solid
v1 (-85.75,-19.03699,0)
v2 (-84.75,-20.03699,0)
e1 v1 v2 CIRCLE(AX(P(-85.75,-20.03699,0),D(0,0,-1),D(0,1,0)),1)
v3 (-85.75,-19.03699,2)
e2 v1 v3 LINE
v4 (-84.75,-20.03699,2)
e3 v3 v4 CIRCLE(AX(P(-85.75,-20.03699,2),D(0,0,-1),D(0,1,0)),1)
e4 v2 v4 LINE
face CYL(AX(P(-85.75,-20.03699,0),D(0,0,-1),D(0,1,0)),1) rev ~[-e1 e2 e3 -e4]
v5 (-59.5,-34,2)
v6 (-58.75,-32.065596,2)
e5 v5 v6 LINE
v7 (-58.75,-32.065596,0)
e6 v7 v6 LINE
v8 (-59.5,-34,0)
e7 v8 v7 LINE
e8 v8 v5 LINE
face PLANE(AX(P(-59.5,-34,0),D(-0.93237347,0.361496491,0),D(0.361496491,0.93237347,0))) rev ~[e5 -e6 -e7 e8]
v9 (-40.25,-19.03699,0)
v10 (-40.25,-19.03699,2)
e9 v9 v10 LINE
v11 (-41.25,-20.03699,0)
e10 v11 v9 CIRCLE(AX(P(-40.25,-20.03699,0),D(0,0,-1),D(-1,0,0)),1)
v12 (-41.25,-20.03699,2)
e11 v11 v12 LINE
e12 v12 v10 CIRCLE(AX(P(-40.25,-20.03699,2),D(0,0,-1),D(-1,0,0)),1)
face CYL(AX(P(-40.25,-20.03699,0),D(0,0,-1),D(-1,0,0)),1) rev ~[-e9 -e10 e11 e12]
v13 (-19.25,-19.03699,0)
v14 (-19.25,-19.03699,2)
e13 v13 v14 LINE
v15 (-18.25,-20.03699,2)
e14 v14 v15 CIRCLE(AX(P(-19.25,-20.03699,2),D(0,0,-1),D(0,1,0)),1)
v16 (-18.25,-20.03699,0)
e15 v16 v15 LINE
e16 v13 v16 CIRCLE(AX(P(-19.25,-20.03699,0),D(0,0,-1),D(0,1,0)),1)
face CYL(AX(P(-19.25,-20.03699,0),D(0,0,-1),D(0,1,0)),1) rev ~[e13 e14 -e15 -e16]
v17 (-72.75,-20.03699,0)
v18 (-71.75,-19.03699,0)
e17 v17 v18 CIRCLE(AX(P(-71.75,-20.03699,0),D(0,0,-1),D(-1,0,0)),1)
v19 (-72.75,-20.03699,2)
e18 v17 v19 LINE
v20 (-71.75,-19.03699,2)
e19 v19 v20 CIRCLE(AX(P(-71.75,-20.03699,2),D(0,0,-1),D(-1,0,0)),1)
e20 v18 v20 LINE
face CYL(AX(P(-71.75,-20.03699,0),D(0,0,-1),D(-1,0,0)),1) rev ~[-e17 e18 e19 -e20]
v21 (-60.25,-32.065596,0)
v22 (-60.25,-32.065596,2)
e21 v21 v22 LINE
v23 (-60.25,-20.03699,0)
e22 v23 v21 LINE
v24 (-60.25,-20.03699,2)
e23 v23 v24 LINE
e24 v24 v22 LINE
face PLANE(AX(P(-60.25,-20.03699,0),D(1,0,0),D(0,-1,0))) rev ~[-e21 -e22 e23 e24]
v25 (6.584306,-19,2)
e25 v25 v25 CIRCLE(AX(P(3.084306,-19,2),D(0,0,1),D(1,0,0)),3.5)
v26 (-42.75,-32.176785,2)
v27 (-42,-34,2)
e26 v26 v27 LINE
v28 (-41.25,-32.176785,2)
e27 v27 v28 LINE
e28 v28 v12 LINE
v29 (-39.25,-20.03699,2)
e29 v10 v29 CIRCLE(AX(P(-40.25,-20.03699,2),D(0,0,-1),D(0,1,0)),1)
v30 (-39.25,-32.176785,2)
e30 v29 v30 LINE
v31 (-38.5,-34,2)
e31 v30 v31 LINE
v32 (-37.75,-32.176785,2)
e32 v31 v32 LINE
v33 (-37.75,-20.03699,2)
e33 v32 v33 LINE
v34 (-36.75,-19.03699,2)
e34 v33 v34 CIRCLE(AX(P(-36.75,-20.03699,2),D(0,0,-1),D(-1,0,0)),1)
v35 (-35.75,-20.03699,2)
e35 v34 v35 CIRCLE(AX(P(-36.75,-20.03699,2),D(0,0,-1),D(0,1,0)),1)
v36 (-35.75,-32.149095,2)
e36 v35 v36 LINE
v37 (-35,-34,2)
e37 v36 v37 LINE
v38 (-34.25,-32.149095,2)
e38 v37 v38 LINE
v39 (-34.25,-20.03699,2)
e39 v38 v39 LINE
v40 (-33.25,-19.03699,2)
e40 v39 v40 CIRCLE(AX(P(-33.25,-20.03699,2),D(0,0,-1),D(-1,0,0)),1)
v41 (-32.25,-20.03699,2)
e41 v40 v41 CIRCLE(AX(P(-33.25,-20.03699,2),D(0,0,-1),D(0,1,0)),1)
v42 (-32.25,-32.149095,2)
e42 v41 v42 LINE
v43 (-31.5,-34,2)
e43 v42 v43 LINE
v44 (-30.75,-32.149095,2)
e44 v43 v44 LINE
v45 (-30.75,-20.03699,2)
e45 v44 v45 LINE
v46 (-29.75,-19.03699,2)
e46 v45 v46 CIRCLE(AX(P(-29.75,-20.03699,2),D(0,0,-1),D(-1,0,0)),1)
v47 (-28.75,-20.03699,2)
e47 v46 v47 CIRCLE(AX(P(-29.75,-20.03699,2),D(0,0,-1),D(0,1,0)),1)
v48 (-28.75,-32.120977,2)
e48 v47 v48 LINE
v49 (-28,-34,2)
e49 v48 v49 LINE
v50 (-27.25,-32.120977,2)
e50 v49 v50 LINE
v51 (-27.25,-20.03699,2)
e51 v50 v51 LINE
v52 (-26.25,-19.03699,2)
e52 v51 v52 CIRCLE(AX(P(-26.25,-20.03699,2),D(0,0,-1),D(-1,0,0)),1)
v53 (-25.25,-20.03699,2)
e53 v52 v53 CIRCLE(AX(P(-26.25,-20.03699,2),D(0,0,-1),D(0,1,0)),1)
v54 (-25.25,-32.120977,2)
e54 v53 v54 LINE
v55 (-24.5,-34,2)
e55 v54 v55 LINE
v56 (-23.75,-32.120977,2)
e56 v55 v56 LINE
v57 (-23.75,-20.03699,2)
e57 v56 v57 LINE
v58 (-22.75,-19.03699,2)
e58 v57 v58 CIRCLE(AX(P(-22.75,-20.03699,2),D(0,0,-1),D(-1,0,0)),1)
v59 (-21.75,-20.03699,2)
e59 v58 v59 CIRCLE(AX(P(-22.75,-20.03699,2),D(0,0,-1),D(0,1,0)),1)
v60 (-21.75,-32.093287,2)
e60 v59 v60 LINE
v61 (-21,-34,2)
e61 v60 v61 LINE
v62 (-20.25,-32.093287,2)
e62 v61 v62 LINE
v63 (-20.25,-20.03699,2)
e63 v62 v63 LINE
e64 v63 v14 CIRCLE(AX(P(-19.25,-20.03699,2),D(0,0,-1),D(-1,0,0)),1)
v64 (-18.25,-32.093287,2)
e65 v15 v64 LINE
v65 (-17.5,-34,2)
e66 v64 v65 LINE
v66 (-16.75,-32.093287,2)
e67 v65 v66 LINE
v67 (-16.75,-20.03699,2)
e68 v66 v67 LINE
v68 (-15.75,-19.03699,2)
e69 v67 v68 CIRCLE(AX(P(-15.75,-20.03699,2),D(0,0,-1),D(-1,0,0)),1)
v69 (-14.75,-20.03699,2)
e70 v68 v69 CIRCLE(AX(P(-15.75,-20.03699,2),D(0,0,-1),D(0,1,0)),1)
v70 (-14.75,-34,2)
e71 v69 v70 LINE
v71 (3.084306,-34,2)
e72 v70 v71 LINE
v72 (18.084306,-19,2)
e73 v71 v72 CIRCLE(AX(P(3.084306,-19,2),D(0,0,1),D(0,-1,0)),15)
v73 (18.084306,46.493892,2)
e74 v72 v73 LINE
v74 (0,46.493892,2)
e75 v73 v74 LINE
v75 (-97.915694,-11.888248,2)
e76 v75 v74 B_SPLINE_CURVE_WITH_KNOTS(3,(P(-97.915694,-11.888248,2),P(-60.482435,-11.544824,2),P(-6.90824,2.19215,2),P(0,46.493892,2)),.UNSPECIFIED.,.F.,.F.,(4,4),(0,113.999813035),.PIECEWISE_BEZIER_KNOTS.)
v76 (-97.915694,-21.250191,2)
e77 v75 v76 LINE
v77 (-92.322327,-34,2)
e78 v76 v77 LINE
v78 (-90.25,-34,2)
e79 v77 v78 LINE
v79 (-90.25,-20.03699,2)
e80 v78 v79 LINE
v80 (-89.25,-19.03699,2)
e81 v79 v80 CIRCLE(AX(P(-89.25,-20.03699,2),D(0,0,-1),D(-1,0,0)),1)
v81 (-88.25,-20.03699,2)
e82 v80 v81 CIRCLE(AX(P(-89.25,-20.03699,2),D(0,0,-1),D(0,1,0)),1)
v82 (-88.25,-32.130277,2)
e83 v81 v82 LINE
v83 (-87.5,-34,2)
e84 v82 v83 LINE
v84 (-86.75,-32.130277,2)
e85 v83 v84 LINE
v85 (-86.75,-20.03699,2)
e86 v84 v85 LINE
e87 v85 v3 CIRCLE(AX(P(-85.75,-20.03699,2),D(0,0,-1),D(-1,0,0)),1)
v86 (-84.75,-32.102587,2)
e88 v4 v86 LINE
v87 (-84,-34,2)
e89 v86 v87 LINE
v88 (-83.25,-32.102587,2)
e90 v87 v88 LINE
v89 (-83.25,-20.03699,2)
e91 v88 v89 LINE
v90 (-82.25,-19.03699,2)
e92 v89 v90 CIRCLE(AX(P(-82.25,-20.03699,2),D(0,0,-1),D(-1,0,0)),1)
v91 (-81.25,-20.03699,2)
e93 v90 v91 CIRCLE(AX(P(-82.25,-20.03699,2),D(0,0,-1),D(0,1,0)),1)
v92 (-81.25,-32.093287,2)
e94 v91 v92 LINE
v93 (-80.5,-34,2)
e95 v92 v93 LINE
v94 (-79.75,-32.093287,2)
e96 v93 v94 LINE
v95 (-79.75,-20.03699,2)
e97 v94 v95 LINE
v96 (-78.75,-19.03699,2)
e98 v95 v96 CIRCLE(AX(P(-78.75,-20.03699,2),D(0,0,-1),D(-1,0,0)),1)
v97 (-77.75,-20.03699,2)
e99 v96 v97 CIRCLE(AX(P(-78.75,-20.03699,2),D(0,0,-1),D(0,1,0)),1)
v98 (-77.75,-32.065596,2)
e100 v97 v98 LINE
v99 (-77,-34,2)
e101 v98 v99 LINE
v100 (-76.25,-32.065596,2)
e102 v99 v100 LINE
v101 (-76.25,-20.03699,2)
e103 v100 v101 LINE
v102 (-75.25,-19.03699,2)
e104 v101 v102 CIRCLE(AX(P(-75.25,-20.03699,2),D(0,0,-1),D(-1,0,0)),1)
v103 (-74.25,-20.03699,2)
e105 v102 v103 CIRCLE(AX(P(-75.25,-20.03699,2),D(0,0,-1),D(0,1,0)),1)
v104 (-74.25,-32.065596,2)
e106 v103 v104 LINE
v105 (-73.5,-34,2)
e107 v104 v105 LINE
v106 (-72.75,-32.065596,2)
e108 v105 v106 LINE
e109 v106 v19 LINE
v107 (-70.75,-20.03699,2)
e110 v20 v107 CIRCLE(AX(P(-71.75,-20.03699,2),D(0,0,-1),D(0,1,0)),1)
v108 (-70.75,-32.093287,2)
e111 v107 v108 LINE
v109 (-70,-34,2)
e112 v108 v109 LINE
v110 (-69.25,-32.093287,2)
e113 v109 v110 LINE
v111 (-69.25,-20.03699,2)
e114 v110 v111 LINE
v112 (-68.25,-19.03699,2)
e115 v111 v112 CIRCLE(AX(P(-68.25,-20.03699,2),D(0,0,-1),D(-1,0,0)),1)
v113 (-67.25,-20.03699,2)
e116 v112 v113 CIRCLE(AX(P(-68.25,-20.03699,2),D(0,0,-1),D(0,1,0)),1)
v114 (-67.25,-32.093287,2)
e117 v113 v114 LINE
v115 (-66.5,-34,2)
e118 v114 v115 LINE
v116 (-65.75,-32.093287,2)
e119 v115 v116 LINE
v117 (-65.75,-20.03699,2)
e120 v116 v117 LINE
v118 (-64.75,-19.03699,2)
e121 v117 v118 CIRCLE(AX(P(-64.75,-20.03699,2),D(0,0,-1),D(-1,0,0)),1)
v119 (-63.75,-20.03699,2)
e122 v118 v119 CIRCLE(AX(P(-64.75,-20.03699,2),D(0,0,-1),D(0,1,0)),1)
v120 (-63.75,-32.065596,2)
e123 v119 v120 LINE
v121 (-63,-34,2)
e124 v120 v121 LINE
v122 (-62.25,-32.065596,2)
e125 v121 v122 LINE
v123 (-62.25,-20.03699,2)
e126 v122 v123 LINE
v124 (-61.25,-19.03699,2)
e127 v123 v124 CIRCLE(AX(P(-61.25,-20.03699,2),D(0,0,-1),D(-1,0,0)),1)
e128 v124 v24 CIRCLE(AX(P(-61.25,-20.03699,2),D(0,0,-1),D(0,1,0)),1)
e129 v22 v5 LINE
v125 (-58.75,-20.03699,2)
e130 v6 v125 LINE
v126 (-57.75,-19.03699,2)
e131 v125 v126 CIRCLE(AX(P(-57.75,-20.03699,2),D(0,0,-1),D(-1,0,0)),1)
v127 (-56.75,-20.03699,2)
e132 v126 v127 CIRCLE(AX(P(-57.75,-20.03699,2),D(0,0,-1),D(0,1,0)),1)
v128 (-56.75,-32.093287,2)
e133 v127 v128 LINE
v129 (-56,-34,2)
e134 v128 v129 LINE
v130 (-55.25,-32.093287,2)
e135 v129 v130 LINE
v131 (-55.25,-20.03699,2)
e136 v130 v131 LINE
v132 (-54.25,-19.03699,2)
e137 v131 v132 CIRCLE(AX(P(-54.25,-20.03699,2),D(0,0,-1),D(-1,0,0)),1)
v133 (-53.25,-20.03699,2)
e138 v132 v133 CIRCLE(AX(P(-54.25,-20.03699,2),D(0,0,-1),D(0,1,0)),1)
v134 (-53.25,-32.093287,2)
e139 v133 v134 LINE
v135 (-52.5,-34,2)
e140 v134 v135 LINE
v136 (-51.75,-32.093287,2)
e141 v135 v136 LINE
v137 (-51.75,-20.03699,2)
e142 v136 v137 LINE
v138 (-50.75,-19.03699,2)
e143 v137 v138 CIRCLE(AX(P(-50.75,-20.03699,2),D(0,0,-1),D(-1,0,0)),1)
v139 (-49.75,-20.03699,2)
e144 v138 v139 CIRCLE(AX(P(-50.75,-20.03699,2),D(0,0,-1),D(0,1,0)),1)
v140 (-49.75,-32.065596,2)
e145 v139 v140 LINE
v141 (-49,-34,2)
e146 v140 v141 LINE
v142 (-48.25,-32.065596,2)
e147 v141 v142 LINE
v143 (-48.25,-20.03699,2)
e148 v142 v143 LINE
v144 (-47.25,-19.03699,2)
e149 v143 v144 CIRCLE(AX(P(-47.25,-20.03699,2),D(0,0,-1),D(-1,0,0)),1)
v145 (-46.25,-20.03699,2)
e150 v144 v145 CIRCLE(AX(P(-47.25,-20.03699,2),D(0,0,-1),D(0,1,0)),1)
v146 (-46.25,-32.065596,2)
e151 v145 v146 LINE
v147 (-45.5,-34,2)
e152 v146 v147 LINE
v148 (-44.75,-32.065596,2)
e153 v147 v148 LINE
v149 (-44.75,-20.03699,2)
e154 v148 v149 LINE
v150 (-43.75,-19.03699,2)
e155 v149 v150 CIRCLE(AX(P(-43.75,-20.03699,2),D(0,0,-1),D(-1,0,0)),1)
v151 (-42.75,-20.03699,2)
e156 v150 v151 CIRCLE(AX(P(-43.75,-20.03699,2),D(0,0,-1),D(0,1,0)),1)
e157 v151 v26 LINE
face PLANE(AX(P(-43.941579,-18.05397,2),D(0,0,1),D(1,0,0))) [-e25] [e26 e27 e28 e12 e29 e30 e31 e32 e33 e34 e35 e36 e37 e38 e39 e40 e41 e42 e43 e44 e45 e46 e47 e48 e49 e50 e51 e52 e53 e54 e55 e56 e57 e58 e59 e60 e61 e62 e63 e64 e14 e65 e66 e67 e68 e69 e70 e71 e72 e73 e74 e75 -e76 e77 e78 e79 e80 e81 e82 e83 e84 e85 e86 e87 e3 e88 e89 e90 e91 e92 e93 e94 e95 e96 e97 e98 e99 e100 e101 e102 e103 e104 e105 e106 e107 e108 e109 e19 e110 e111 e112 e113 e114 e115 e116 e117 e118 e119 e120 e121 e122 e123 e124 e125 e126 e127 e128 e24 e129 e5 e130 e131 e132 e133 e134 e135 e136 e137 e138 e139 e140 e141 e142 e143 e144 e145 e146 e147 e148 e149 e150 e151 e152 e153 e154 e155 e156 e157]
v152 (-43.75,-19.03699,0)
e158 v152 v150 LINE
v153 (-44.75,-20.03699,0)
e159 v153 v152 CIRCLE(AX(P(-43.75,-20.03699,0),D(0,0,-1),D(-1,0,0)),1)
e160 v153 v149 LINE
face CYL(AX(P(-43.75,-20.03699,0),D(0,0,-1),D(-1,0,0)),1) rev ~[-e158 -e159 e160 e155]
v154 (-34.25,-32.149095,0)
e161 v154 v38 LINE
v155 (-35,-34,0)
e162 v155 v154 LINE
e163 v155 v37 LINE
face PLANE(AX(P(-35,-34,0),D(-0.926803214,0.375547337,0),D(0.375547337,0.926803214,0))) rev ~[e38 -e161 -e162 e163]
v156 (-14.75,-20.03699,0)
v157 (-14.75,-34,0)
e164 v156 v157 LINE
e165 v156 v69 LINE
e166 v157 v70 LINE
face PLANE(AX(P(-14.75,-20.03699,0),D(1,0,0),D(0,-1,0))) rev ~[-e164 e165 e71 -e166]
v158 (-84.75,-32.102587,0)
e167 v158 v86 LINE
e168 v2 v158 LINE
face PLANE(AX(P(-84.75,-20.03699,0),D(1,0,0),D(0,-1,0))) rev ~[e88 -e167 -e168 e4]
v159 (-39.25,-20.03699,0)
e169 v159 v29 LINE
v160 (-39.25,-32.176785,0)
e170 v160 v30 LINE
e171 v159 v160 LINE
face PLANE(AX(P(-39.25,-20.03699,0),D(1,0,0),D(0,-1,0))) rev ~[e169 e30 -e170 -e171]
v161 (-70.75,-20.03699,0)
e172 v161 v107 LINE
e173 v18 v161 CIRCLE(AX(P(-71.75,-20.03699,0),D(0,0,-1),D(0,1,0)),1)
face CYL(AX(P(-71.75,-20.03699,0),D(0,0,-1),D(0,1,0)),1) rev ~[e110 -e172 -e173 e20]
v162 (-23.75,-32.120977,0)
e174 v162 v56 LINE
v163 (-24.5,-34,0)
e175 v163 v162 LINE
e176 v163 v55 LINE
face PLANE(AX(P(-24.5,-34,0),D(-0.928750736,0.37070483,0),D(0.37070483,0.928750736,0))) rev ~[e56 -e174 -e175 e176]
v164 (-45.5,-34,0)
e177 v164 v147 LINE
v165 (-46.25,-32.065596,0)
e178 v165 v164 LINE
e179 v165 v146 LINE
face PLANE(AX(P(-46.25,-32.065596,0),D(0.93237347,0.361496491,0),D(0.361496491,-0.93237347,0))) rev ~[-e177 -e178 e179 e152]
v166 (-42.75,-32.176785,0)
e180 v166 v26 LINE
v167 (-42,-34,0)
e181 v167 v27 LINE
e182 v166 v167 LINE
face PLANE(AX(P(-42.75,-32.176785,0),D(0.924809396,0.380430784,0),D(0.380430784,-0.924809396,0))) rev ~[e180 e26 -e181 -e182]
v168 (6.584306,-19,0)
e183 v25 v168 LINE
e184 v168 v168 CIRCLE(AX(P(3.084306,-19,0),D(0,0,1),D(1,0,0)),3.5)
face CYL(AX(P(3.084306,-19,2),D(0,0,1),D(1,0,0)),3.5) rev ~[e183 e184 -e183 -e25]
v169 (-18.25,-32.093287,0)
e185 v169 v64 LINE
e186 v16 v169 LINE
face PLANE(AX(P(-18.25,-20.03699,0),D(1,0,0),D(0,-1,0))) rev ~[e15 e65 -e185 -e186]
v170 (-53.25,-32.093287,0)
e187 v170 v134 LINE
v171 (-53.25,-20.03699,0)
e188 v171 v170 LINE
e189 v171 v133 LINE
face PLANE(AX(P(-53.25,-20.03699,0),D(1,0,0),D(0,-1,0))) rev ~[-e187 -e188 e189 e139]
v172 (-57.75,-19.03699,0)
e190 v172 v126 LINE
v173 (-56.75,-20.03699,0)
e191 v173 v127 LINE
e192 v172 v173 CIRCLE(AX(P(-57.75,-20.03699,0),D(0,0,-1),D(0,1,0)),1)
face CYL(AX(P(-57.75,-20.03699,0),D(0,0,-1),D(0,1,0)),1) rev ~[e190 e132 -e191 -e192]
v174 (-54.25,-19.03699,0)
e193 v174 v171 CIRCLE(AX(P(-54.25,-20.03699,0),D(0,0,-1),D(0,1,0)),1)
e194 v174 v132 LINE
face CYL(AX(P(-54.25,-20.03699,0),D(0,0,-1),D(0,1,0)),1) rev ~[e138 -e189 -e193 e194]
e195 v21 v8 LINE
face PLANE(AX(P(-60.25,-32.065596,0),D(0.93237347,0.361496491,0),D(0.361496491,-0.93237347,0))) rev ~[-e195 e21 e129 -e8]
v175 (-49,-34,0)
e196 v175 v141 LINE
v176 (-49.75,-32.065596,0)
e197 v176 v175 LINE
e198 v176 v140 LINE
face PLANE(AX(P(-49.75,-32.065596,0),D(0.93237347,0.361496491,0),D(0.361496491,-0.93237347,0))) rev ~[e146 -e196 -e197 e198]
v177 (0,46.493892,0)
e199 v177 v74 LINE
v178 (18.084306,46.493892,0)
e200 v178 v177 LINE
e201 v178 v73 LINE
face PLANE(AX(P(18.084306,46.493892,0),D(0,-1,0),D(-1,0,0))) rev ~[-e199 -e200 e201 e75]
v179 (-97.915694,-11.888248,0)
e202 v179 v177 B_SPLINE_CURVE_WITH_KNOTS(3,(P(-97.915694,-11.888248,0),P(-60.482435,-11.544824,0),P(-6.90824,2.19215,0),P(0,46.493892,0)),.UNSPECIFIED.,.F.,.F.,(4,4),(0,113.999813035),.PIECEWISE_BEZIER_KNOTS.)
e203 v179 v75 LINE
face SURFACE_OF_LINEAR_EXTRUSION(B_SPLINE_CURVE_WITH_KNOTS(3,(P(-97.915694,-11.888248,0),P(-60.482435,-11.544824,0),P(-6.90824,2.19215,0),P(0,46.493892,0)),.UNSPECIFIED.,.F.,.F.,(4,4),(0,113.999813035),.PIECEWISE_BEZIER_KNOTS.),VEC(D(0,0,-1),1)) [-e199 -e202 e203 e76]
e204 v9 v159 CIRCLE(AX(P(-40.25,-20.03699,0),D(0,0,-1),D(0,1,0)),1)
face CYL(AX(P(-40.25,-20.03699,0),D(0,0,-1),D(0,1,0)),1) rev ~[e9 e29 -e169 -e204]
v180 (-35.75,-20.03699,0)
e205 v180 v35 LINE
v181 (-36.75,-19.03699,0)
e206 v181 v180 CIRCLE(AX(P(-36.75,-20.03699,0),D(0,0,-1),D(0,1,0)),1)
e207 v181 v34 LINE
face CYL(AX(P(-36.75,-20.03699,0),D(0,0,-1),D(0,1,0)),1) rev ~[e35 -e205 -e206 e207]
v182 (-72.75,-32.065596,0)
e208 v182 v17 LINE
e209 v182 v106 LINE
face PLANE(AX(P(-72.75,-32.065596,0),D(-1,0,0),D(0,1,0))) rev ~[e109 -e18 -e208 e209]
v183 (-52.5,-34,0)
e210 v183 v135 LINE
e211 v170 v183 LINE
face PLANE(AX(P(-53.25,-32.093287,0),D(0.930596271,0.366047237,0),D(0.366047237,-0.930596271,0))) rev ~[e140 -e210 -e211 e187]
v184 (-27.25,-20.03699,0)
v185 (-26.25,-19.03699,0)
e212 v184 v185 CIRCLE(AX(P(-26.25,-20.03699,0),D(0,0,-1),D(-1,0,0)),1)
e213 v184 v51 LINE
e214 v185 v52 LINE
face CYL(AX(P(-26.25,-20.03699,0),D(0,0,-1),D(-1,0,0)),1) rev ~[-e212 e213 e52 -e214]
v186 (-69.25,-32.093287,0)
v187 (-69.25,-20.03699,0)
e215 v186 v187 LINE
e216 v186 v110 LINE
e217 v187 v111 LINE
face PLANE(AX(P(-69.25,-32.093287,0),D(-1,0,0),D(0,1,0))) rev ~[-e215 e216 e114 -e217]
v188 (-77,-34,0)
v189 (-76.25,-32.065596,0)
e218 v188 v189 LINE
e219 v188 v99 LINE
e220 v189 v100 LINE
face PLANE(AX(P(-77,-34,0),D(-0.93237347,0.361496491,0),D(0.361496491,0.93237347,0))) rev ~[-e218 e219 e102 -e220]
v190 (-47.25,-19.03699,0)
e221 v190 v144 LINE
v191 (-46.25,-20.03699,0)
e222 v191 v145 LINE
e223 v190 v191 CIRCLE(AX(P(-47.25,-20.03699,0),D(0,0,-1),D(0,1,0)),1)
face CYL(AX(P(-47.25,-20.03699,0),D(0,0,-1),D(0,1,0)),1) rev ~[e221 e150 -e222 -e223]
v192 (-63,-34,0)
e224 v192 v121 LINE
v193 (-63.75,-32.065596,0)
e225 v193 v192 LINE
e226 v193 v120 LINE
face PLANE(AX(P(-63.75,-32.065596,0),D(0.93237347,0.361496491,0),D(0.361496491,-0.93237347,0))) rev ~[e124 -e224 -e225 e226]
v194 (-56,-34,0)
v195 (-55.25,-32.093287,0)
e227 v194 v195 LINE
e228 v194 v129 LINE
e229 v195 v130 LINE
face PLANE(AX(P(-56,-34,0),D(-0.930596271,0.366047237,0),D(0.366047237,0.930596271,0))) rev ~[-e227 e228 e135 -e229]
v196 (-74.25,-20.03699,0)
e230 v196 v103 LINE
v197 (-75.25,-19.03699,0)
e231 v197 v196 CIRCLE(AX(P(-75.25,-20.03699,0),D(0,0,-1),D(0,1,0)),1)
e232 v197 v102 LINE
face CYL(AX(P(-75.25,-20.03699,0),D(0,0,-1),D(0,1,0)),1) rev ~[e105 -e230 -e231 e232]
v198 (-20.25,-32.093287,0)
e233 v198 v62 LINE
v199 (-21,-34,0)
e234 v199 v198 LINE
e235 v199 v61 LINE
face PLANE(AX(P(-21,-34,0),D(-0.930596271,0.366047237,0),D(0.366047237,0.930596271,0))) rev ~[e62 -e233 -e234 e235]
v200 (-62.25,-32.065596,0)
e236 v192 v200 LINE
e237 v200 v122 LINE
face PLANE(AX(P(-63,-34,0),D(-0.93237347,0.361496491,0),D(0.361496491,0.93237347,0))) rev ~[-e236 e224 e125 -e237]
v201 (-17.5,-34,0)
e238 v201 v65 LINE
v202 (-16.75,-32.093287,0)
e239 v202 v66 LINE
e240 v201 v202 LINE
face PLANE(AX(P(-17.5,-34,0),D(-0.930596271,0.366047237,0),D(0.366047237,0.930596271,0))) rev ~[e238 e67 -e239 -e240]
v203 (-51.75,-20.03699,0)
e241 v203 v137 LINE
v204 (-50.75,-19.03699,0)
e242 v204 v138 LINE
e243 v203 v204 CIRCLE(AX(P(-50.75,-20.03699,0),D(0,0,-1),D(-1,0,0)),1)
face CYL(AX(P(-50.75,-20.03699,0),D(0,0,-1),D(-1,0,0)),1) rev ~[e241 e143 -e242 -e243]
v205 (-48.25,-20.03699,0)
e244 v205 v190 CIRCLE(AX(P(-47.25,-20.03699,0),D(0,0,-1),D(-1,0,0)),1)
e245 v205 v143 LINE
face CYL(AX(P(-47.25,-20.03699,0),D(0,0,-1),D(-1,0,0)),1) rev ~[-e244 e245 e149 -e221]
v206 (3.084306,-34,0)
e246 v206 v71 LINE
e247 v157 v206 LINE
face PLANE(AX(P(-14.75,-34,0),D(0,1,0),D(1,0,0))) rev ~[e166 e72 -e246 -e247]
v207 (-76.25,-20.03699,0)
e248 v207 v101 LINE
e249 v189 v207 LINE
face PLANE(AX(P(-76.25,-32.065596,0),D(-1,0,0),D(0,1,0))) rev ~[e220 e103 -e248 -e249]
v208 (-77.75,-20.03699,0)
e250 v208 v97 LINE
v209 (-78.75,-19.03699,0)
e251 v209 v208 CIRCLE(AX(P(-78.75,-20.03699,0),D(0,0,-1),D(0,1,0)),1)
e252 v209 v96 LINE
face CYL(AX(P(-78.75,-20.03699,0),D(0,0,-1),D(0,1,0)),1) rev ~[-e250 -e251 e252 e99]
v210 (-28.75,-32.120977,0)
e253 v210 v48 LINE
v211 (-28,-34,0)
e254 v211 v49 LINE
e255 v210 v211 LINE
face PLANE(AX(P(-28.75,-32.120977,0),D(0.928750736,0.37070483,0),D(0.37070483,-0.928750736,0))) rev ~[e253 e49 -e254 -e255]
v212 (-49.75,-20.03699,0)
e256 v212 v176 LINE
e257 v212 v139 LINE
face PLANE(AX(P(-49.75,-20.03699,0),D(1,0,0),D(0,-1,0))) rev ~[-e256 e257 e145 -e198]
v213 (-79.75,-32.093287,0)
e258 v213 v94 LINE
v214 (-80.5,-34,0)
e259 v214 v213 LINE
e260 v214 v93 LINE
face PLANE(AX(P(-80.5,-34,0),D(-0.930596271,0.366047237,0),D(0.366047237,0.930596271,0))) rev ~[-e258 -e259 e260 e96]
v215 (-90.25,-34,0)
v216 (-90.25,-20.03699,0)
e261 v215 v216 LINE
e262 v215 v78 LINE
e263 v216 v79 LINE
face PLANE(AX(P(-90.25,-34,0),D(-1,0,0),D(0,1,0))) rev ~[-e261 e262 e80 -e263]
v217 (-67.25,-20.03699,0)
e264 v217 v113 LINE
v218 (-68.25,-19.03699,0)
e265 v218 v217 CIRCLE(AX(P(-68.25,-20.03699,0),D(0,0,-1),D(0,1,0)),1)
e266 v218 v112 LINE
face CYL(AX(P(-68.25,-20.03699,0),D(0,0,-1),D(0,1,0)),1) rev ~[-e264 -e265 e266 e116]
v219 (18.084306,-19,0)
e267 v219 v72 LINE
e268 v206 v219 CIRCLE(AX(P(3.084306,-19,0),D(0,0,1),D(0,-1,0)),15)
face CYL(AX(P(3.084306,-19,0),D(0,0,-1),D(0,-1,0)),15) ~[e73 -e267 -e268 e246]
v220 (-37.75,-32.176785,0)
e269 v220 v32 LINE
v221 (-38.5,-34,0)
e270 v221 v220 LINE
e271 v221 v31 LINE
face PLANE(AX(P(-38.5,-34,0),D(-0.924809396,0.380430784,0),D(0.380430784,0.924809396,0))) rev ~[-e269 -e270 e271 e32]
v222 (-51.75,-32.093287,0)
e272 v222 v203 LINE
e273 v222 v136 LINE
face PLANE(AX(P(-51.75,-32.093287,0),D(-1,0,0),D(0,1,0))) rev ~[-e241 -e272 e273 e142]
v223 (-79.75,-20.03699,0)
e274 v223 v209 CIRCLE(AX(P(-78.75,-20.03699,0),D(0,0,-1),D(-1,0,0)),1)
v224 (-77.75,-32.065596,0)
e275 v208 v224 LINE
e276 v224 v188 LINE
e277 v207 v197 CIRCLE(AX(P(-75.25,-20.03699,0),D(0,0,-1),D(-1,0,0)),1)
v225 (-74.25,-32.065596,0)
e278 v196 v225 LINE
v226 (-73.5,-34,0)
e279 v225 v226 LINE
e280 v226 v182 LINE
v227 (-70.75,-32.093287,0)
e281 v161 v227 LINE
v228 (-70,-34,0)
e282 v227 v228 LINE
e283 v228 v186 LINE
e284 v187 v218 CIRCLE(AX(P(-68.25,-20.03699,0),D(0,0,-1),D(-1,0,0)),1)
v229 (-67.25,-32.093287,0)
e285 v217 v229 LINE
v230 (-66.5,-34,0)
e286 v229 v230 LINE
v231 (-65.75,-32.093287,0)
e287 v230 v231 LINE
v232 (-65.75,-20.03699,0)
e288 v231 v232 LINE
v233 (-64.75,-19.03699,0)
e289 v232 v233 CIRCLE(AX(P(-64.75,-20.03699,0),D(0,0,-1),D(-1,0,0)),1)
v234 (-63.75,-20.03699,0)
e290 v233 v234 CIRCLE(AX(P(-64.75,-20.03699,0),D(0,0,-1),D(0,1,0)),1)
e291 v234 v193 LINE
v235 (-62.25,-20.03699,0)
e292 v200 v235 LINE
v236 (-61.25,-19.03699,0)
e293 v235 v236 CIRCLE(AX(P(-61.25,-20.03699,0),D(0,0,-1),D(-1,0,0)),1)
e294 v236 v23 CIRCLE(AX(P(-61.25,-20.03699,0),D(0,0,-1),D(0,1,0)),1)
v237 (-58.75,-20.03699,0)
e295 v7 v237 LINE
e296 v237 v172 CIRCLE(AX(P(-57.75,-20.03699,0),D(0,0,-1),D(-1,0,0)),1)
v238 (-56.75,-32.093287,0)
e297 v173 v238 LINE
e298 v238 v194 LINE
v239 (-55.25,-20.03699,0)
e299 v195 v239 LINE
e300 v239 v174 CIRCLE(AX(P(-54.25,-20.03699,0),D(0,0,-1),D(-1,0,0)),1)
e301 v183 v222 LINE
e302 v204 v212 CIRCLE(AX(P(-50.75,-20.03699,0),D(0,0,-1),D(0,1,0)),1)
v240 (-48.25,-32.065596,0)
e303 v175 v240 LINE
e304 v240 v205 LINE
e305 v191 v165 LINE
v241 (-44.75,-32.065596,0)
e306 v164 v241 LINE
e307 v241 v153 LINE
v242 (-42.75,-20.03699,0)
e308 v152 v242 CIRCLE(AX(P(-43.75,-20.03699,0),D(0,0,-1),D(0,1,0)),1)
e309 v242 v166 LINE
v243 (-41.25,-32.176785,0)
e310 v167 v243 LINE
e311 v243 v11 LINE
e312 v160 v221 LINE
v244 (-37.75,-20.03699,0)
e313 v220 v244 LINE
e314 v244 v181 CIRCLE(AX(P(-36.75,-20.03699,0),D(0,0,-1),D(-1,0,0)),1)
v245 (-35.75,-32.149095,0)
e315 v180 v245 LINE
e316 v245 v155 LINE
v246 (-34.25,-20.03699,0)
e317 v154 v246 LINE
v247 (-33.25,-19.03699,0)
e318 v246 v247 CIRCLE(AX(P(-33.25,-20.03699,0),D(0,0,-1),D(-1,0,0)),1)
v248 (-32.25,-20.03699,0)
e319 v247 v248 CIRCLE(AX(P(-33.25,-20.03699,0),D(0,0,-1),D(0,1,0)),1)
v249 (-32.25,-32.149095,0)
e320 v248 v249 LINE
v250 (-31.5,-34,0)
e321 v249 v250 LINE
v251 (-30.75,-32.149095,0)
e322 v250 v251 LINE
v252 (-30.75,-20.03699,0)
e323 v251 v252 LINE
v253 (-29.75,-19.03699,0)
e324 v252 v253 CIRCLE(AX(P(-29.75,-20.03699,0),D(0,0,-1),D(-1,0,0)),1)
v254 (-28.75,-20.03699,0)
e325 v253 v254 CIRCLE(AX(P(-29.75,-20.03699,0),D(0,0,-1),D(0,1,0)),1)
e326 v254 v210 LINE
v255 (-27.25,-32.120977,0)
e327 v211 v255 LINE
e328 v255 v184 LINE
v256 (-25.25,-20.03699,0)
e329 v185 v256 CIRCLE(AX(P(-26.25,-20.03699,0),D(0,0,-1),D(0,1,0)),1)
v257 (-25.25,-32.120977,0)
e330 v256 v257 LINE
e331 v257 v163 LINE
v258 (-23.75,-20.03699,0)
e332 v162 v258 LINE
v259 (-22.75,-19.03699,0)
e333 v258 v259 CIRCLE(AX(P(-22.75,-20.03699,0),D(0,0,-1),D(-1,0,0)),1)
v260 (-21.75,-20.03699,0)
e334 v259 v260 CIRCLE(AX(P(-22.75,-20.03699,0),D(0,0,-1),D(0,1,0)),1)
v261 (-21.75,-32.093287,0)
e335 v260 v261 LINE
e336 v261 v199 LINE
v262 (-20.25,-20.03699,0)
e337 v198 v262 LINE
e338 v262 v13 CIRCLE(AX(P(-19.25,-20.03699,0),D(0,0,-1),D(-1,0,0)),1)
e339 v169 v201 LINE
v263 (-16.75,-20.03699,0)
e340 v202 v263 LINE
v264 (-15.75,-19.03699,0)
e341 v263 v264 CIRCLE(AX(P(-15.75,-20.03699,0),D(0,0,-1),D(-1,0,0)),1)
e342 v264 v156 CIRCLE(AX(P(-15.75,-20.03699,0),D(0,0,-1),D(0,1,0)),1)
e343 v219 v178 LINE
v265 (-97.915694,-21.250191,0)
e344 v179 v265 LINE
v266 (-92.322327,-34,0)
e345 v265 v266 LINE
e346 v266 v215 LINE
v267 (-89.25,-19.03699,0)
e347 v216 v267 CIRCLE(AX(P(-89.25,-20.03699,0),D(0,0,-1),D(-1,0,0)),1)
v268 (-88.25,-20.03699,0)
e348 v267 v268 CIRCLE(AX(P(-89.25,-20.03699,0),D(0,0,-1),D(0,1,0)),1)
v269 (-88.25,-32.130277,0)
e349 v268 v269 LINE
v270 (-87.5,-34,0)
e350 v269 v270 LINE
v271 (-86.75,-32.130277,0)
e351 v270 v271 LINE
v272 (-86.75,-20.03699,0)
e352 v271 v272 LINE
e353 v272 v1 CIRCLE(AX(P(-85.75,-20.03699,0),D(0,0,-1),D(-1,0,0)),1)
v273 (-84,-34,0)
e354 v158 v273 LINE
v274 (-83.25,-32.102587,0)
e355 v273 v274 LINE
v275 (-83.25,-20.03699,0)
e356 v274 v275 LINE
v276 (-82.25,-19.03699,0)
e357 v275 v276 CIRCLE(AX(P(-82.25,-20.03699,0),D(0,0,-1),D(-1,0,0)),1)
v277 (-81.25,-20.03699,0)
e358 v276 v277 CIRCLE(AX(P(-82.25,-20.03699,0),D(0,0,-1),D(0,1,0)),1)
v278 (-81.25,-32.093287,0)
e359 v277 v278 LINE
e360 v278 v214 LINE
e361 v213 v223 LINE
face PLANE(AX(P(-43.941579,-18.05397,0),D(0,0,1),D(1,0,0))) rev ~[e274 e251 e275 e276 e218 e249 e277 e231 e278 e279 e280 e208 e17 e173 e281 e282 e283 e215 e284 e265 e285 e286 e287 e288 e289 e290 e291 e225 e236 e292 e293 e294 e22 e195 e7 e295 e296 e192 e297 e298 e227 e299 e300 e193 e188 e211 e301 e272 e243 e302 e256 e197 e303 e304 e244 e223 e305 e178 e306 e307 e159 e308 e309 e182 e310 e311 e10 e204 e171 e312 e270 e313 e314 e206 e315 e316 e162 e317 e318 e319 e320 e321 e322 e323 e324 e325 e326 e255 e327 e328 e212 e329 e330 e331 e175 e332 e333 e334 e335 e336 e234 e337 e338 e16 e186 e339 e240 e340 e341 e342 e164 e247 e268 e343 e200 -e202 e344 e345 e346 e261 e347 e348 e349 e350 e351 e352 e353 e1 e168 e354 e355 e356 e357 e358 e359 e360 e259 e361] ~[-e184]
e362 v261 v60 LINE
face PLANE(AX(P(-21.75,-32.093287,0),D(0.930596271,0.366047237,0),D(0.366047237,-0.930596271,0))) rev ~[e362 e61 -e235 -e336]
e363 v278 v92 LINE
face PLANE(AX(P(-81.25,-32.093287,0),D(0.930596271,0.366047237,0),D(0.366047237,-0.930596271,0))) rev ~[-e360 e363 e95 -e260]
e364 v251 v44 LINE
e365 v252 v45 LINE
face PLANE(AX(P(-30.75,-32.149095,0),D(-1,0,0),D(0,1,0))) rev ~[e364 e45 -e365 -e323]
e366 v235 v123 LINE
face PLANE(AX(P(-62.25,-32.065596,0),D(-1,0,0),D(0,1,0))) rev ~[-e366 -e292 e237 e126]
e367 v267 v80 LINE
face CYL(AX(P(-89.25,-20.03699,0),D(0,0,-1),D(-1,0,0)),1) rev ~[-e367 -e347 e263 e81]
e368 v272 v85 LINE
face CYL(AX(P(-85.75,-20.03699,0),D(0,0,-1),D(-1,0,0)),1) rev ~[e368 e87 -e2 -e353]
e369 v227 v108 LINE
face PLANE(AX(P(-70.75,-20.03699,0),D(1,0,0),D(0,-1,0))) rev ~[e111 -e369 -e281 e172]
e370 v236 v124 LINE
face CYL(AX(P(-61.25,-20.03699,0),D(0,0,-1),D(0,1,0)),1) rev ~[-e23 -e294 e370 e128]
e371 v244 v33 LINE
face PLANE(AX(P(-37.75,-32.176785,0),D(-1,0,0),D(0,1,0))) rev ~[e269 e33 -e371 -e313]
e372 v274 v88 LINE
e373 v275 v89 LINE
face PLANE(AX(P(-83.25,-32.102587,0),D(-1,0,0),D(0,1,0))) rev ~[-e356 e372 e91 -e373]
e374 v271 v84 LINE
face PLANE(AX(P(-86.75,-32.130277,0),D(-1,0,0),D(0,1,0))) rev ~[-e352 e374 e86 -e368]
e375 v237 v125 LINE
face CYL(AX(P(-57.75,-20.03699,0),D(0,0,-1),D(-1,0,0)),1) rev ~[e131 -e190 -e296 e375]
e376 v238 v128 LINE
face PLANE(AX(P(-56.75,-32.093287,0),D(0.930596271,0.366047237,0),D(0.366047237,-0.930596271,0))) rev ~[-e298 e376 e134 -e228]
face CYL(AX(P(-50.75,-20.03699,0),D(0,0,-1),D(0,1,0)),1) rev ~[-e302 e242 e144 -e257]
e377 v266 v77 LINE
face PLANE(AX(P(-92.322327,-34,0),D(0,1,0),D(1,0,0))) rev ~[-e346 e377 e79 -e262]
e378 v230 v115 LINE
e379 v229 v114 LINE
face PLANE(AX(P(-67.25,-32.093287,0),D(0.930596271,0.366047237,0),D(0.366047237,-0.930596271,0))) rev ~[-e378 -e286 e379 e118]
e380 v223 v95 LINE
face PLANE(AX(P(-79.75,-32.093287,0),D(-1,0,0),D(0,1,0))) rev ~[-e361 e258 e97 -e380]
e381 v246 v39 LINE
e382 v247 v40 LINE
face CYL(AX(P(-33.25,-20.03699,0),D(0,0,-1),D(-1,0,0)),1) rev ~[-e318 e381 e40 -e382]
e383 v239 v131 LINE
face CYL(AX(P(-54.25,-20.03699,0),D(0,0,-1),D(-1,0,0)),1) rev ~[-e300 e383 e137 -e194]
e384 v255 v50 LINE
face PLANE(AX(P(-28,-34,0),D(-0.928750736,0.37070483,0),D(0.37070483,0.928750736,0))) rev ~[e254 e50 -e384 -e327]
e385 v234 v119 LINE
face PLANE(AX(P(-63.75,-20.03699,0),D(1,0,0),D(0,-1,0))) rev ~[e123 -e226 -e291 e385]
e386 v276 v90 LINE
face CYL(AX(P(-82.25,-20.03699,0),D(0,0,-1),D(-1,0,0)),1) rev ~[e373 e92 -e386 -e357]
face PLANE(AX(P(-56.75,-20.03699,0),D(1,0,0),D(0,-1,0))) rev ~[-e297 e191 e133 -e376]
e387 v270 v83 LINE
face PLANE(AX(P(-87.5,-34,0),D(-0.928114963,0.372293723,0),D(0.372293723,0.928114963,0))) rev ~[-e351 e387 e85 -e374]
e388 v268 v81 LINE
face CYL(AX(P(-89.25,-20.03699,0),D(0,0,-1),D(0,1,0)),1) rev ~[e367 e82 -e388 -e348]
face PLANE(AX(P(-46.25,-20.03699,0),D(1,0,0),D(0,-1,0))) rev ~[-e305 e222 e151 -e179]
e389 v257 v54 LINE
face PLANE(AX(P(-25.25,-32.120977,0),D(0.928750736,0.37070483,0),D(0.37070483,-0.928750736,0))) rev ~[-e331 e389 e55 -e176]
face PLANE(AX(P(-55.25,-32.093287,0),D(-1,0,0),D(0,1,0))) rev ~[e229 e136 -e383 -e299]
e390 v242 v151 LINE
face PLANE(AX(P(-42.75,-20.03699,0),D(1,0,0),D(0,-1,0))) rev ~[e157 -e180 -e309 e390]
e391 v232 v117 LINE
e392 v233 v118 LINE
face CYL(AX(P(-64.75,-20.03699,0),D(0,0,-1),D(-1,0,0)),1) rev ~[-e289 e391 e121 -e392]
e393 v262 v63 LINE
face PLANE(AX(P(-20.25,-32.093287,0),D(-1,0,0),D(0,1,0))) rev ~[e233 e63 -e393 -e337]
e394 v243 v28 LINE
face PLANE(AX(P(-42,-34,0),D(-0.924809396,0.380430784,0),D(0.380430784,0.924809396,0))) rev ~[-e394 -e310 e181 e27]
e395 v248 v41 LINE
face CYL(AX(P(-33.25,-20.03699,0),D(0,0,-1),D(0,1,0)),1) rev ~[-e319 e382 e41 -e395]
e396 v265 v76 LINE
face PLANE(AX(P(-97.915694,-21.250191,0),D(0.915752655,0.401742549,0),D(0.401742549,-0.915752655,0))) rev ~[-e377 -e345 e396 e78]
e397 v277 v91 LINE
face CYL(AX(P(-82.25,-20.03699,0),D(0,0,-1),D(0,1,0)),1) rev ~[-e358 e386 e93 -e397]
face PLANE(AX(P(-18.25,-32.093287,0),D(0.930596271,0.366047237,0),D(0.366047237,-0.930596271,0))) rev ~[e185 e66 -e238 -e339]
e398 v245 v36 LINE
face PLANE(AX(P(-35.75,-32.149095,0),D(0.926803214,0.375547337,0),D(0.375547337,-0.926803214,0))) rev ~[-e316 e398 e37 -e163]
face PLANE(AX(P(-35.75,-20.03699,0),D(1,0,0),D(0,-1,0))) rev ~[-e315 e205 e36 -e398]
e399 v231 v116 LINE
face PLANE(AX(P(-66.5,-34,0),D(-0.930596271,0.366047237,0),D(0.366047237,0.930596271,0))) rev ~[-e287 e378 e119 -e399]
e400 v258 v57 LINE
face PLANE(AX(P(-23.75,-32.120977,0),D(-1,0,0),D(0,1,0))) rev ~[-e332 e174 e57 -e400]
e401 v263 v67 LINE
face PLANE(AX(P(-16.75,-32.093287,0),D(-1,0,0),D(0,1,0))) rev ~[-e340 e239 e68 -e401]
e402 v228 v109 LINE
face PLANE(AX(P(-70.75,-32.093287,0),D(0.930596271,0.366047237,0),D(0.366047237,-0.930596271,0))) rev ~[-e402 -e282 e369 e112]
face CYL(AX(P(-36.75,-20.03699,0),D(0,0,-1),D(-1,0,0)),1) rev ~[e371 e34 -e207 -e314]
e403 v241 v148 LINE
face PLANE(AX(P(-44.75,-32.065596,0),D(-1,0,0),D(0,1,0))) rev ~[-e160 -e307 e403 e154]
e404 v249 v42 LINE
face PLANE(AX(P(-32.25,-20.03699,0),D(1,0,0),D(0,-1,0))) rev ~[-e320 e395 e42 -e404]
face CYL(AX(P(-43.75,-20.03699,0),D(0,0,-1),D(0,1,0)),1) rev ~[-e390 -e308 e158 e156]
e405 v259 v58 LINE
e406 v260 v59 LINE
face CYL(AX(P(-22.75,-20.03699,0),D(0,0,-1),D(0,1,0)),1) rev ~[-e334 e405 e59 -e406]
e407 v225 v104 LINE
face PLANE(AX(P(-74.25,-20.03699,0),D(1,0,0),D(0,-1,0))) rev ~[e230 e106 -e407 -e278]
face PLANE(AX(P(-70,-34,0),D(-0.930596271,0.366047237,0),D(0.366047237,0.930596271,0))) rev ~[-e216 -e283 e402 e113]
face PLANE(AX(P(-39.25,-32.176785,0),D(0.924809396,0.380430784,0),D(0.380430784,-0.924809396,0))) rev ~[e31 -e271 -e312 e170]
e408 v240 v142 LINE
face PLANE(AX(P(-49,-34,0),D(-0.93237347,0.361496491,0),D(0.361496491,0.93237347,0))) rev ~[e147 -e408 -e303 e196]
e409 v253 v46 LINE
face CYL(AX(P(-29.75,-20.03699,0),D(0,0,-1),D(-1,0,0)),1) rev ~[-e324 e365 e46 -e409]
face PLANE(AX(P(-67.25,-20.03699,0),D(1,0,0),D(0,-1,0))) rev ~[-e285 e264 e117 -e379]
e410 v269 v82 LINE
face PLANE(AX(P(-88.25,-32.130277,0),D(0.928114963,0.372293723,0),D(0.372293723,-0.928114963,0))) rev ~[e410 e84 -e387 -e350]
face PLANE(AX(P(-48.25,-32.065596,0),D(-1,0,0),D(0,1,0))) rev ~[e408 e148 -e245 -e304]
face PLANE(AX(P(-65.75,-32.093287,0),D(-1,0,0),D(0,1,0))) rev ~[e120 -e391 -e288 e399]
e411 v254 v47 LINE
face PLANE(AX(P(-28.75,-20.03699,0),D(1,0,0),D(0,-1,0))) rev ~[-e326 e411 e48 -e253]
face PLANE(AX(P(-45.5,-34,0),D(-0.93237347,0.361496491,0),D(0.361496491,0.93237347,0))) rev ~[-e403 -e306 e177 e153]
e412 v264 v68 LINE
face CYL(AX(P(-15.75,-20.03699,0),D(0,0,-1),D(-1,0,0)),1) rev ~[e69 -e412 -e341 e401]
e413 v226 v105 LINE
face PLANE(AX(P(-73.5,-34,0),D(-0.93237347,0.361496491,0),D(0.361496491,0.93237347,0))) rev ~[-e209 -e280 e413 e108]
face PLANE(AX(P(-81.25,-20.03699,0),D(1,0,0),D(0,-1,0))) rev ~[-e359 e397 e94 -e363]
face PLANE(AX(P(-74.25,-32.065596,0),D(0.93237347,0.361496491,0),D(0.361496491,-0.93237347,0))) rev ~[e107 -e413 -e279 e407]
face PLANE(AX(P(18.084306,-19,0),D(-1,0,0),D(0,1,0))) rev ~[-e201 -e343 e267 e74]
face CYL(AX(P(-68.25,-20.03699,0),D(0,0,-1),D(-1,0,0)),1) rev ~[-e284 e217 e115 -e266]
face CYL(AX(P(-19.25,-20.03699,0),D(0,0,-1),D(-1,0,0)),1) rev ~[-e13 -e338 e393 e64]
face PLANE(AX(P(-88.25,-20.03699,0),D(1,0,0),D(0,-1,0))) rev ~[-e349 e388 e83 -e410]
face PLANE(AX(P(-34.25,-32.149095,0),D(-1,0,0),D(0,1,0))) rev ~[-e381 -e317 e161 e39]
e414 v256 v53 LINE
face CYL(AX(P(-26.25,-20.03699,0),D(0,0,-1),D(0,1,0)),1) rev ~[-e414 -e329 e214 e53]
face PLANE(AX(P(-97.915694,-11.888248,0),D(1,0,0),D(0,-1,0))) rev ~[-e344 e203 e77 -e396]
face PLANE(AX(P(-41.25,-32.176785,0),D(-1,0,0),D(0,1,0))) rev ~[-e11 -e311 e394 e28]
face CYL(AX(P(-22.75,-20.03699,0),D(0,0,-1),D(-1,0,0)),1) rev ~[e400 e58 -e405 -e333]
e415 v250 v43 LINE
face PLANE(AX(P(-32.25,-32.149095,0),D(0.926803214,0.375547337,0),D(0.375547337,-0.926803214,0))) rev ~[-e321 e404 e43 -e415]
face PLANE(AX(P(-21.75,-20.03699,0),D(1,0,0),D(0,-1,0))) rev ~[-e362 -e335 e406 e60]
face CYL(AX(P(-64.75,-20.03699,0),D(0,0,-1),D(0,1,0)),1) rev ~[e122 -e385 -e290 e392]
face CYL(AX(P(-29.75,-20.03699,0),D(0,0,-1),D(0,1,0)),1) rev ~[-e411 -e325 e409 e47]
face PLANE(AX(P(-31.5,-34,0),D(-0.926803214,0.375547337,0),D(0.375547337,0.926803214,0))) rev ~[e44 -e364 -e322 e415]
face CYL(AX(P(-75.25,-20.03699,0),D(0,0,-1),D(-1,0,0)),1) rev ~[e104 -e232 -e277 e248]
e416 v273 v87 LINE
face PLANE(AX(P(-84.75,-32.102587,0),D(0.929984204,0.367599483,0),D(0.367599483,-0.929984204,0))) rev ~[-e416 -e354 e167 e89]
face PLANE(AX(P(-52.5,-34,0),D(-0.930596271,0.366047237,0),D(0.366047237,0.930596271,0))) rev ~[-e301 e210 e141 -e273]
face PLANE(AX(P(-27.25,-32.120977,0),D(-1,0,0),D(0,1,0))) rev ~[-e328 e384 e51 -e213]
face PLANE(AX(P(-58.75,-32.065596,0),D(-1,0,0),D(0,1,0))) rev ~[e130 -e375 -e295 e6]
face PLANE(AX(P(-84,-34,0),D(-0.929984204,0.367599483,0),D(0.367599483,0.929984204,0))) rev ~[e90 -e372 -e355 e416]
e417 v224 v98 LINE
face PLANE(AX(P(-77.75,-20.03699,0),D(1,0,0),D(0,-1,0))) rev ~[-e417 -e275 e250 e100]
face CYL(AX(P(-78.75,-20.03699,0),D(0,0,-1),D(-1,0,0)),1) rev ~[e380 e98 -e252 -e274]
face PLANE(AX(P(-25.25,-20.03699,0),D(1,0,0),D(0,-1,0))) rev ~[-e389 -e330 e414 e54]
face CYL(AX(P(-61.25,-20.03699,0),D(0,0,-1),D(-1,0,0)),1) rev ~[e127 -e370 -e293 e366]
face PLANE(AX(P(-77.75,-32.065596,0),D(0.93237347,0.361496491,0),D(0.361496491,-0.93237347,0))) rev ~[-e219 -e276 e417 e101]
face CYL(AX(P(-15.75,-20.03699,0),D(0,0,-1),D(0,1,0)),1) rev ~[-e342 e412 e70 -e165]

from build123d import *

# Parameters (mm, degrees)
F1_DEPTH = 2
F2_R     = 3.5
F3_DEPTH = 25


# Not quite as in the source:
# - a feature names something its author has since deleted; it is built from what else it names


with BuildPart() as f1:
    # F0 (on Top) → F1 (new body)
    with BuildSketch(Plane.XY):
        with BuildLine():
            ThreePointArc((-15.75, -19.0369902551), (-15.0428932188, -19.3298834739), (-14.75, -20.0369902551))
            Line((-14.75, -20.0369902551), (-14.75, -34))
            Line((-14.75, -34), (3.0843058825, -34))
            ThreePointArc((3.0843058825, -34), (13.6909076003, -29.6066017178), (18.0843058825, -19))
            Line((18.0843058825, -19), (18.0843058825, 46.4938916266))
            Line((18.0843058825, 46.4938916266), (0, 46.4938916266))
            add(Edge.make_bspline(
                [(-97.9156941175, -11.8882479146), (-60.4824349284, -11.5448236465), (-6.9082397968, 2.1921501029), (0, 46.4938916266)],
                knots=[0, 0, 0, 0, 113.9998130346, 113.9998130346, 113.9998130346, 113.9998130346], degree=3))
            Line((-97.9156941175, -11.8882479146), (-97.9156941175, -21.2501913908))
            Line((-97.9156941175, -21.2501913908), (-92.3223271966, -34))
            Line((-92.3223271966, -34), (-90.25, -34))
            Line((-90.25, -34), (-90.25, -32.1302767694))
            Line((-90.25, -32.1302767694), (-90.25, -20.0369902551))
            ThreePointArc((-90.25, -20.0369902551), (-89.9571067812, -19.3298834739), (-89.25, -19.0369902551))
            ThreePointArc((-89.25, -19.0369902551), (-88.5428932188, -19.3298834739), (-88.25, -20.0369902551))
            Line((-88.25, -20.0369902551), (-88.25, -32.1302767694))
            Line((-88.25, -32.1302767694), (-87.5, -34))
            Line((-87.5, -34), (-86.75, -32.1302767694))
            Line((-86.75, -32.1302767694), (-86.75, -20.0369902551))
            ThreePointArc((-86.75, -20.0369902551), (-86.4571067812, -19.3298834739), (-85.75, -19.0369902551))
            ThreePointArc((-85.75, -19.0369902551), (-85.0428932188, -19.3298834739), (-84.75, -20.0369902551))
            Line((-84.75, -20.0369902551), (-84.75, -32.1025866866))
            Line((-84.75, -32.1025866866), (-84, -34))
            Line((-84, -34), (-83.25, -32.1025866866))
            Line((-83.25, -32.1025866866), (-83.25, -20.0369902551))
            ThreePointArc((-83.25, -20.0369902551), (-82.9571067812, -19.3298834739), (-82.25, -19.0369902551))
            ThreePointArc((-82.25, -19.0369902551), (-81.5428932188, -19.3298834739), (-81.25, -20.0369902551))
            Line((-81.25, -20.0369902551), (-81.25, -32.0932865143))
            Line((-81.25, -32.0932865143), (-80.5, -34))
            Line((-80.5, -34), (-79.75, -32.0932865143))
            Line((-79.75, -32.0932865143), (-79.75, -20.0369902551))
            ThreePointArc((-79.75, -20.0369902551), (-79.4571067812, -19.3298834739), (-78.75, -19.0369902551))
            ThreePointArc((-78.75, -19.0369902551), (-78.0428932188, -19.3298834739), (-77.75, -20.0369902551))
            Line((-77.75, -20.0369902551), (-77.75, -32.0655964315))
            Line((-77.75, -32.0655964315), (-77, -34))
            Line((-77, -34), (-76.25, -32.0655964315))
            Line((-76.25, -32.0655964315), (-76.25, -20.0369902551))
            ThreePointArc((-76.25, -20.0369902551), (-75.9571067812, -19.3298834739), (-75.25, -19.0369902551))
            ThreePointArc((-75.25, -19.0369902551), (-74.5428932188, -19.3298834739), (-74.25, -20.0369902551))
            Line((-74.25, -20.0369902551), (-74.25, -32.0655964315))
            Line((-74.25, -32.0655964315), (-73.5, -34))
            Line((-73.5, -34), (-72.75, -32.0655964315))
            Line((-72.75, -32.0655964315), (-72.75, -20.0369902551))
            ThreePointArc((-72.75, -20.0369902551), (-72.4571067812, -19.3298834739), (-71.75, -19.0369902551))
            ThreePointArc((-71.75, -19.0369902551), (-71.0428932188, -19.3298834739), (-70.75, -20.0369902551))
            Line((-70.75, -20.0369902551), (-70.75, -32.0932865143))
            Line((-70.75, -32.0932865143), (-70, -34))
            Line((-70, -34), (-69.25, -32.0932865143))
            Line((-69.25, -32.0932865143), (-69.25, -20.0369902551))
            ThreePointArc((-69.25, -20.0369902551), (-68.9571067812, -19.3298834739), (-68.25, -19.0369902551))
            ThreePointArc((-68.25, -19.0369902551), (-67.5428932188, -19.3298834739), (-67.25, -20.0369902551))
            Line((-67.25, -20.0369902551), (-67.25, -32.0932865143))
            Line((-67.25, -32.0932865143), (-66.5, -34))
            Line((-66.5, -34), (-65.75, -32.0932865143))
            Line((-65.75, -32.0932865143), (-65.75, -20.0369902551))
            ThreePointArc((-65.75, -20.0369902551), (-65.4571067812, -19.3298834739), (-64.75, -19.0369902551))
            ThreePointArc((-64.75, -19.0369902551), (-64.0428932188, -19.3298834739), (-63.75, -20.0369902551))
            Line((-63.75, -20.0369902551), (-63.75, -32.0655964315))
            Line((-63.75, -32.0655964315), (-63, -34))
            Line((-63, -34), (-62.25, -32.0655964315))
            Line((-62.25, -32.0655964315), (-62.25, -20.0369902551))
            ThreePointArc((-62.25, -20.0369902551), (-61.9571067812, -19.3298834739), (-61.25, -19.0369902551))
            ThreePointArc((-61.25, -19.0369902551), (-60.5428932188, -19.3298834739), (-60.25, -20.0369902551))
            Line((-60.25, -20.0369902551), (-60.25, -32.0655964315))
            Line((-60.25, -32.0655964315), (-59.5, -34))
            Line((-59.5, -34), (-58.75, -32.0655964315))
            Line((-58.75, -32.0655964315), (-58.75, -20.0369902551))
            ThreePointArc((-58.75, -20.0369902551), (-58.4571067812, -19.3298834739), (-57.75, -19.0369902551))
            ThreePointArc((-57.75, -19.0369902551), (-57.0428932188, -19.3298834739), (-56.75, -20.0369902551))
            Line((-56.75, -20.0369902551), (-56.75, -32.0932865143))
            Line((-56.75, -32.0932865143), (-56, -34))
            Line((-56, -34), (-55.25, -32.0932865143))
            Line((-55.25, -32.0932865143), (-55.25, -20.0369902551))
            ThreePointArc((-55.25, -20.0369902551), (-54.9571067812, -19.3298834739), (-54.25, -19.0369902551))
            ThreePointArc((-54.25, -19.0369902551), (-53.5428932188, -19.3298834739), (-53.25, -20.0369902551))
            Line((-53.25, -20.0369902551), (-53.25, -32.0932865143))
            Line((-53.25, -32.0932865143), (-52.5, -34))
            Line((-52.5, -34), (-51.75, -32.0932865143))
            Line((-51.75, -32.0932865143), (-51.75, -20.0369902551))
            ThreePointArc((-51.75, -20.0369902551), (-51.4571067812, -19.3298834739), (-50.75, -19.0369902551))
            ThreePointArc((-50.75, -19.0369902551), (-50.0428932188, -19.3298834739), (-49.75, -20.0369902551))
            Line((-49.75, -20.0369902551), (-49.75, -32.0655964315))
            Line((-49.75, -32.0655964315), (-49, -34))
            Line((-49, -34), (-48.25, -32.0655964315))
            Line((-48.25, -32.0655964315), (-48.25, -20.0369902551))
            ThreePointArc((-48.25, -20.0369902551), (-47.9571067812, -19.3298834739), (-47.25, -19.0369902551))
            ThreePointArc((-47.25, -19.0369902551), (-46.5428932188, -19.3298834739), (-46.25, -20.0369902551))
            Line((-46.25, -20.0369902551), (-46.25, -32.0655964315))
            Line((-46.25, -32.0655964315), (-45.5, -34))
            Line((-45.5, -34), (-44.75, -32.0655964315))
            Line((-44.75, -32.0655964315), (-44.75, -20.0369902551))
            ThreePointArc((-44.75, -20.0369902551), (-44.4571067812, -19.3298834739), (-43.75, -19.0369902551))
            ThreePointArc((-43.75, -19.0369902551), (-43.0428932188, -19.3298834739), (-42.75, -20.0369902551))
            Line((-42.75, -20.0369902551), (-42.75, -32.176785171))
            Line((-42.75, -32.176785171), (-42, -34))
            Line((-42, -34), (-41.25, -32.176785171))
            Line((-41.25, -32.176785171), (-41.25, -20.0369902551))
            ThreePointArc((-41.25, -20.0369902551), (-40.9571067812, -19.3298834739), (-40.25, -19.0369902551))
            ThreePointArc((-40.25, -19.0369902551), (-39.5428932188, -19.3298834739), (-39.25, -20.0369902551))
            Line((-39.25, -20.0369902551), (-39.25, -32.176785171))
            Line((-39.25, -32.176785171), (-38.5, -34))
            Line((-38.5, -34), (-37.75, -32.176785171))
            Line((-37.75, -32.176785171), (-37.75, -20.0369902551))
            ThreePointArc((-37.75, -20.0369902551), (-37.4571067812, -19.3298834739), (-36.75, -19.0369902551))
            ThreePointArc((-36.75, -19.0369902551), (-36.0428932188, -19.3298834739), (-35.75, -20.0369902551))
            Line((-35.75, -20.0369902551), (-35.75, -32.1490950882))
            Line((-35.75, -32.1490950882), (-35, -34))
            Line((-35, -34), (-34.25, -32.1490950882))
            Line((-34.25, -32.1490950882), (-34.25, -20.0369902551))
            ThreePointArc((-34.25, -20.0369902551), (-33.9571067812, -19.3298834739), (-33.25, -19.0369902551))
            ThreePointArc((-33.25, -19.0369902551), (-32.5428932188, -19.3298834739), (-32.25, -20.0369902551))
            Line((-32.25, -20.0369902551), (-32.25, -32.1490950882))
            Line((-32.25, -32.1490950882), (-31.5, -34))
            Line((-31.5, -34), (-30.75, -32.1490950882))
            Line((-30.75, -32.1490950882), (-30.75, -20.0369902551))
            ThreePointArc((-30.75, -20.0369902551), (-30.4571067812, -19.3298834739), (-29.75, -19.0369902551))
            ThreePointArc((-29.75, -19.0369902551), (-29.0428932188, -19.3298834739), (-28.75, -20.0369902551))
            Line((-28.75, -20.0369902551), (-28.75, -32.1209765971))
            Line((-28.75, -32.1209765971), (-28, -34))
            Line((-28, -34), (-27.25, -32.1209765971))
            Line((-27.25, -32.1209765971), (-27.25, -20.0369902551))
            ThreePointArc((-27.25, -20.0369902551), (-26.9571067812, -19.3298834739), (-26.25, -19.0369902551))
            ThreePointArc((-26.25, -19.0369902551), (-25.5428932188, -19.3298834739), (-25.25, -20.0369902551))
            Line((-25.25, -20.0369902551), (-25.25, -32.1209765971))
            Line((-25.25, -32.1209765971), (-24.5, -34))
            Line((-24.5, -34), (-23.75, -32.1209765971))
            Line((-23.75, -32.1209765971), (-23.75, -20.0369902551))
            ThreePointArc((-23.75, -20.0369902551), (-23.4571067812, -19.3298834739), (-22.75, -19.0369902551))
            ThreePointArc((-22.75, -19.0369902551), (-22.0428932188, -19.3298834739), (-21.75, -20.0369902551))
            Line((-21.75, -20.0369902551), (-21.75, -32.0932865143))
            Line((-21.75, -32.0932865143), (-21, -34))
            Line((-21, -34), (-20.25, -32.0932865143))
            Line((-20.25, -32.0932865143), (-20.25, -20.0369902551))
            ThreePointArc((-20.25, -20.0369902551), (-19.9571067812, -19.3298834739), (-19.25, -19.0369902551))
            ThreePointArc((-19.25, -19.0369902551), (-18.5428932188, -19.3298834739), (-18.25, -20.0369902551))
            Line((-18.25, -20.0369902551), (-18.25, -32.0932865143))
            Line((-18.25, -32.0932865143), (-17.5, -34))
            Line((-17.5, -34), (-16.75, -32.0932865143))
            Line((-16.75, -32.0932865143), (-16.75, -20.0369902551))
            ThreePointArc((-16.75, -20.0369902551), (-16.4571067812, -19.3298834739), (-15.75, -19.0369902551))
        make_face()
    extrude(amount=F1_DEPTH)

    # F2 (on face) → F3 (cut)
    with BuildSketch(Plane.XY.offset(2)):
        with Locations((3.0843058825, -19)):
            Circle(F2_R)
    extrude(amount=-F3_DEPTH, mode=Mode.SUBTRACT)


solid = f1.part
